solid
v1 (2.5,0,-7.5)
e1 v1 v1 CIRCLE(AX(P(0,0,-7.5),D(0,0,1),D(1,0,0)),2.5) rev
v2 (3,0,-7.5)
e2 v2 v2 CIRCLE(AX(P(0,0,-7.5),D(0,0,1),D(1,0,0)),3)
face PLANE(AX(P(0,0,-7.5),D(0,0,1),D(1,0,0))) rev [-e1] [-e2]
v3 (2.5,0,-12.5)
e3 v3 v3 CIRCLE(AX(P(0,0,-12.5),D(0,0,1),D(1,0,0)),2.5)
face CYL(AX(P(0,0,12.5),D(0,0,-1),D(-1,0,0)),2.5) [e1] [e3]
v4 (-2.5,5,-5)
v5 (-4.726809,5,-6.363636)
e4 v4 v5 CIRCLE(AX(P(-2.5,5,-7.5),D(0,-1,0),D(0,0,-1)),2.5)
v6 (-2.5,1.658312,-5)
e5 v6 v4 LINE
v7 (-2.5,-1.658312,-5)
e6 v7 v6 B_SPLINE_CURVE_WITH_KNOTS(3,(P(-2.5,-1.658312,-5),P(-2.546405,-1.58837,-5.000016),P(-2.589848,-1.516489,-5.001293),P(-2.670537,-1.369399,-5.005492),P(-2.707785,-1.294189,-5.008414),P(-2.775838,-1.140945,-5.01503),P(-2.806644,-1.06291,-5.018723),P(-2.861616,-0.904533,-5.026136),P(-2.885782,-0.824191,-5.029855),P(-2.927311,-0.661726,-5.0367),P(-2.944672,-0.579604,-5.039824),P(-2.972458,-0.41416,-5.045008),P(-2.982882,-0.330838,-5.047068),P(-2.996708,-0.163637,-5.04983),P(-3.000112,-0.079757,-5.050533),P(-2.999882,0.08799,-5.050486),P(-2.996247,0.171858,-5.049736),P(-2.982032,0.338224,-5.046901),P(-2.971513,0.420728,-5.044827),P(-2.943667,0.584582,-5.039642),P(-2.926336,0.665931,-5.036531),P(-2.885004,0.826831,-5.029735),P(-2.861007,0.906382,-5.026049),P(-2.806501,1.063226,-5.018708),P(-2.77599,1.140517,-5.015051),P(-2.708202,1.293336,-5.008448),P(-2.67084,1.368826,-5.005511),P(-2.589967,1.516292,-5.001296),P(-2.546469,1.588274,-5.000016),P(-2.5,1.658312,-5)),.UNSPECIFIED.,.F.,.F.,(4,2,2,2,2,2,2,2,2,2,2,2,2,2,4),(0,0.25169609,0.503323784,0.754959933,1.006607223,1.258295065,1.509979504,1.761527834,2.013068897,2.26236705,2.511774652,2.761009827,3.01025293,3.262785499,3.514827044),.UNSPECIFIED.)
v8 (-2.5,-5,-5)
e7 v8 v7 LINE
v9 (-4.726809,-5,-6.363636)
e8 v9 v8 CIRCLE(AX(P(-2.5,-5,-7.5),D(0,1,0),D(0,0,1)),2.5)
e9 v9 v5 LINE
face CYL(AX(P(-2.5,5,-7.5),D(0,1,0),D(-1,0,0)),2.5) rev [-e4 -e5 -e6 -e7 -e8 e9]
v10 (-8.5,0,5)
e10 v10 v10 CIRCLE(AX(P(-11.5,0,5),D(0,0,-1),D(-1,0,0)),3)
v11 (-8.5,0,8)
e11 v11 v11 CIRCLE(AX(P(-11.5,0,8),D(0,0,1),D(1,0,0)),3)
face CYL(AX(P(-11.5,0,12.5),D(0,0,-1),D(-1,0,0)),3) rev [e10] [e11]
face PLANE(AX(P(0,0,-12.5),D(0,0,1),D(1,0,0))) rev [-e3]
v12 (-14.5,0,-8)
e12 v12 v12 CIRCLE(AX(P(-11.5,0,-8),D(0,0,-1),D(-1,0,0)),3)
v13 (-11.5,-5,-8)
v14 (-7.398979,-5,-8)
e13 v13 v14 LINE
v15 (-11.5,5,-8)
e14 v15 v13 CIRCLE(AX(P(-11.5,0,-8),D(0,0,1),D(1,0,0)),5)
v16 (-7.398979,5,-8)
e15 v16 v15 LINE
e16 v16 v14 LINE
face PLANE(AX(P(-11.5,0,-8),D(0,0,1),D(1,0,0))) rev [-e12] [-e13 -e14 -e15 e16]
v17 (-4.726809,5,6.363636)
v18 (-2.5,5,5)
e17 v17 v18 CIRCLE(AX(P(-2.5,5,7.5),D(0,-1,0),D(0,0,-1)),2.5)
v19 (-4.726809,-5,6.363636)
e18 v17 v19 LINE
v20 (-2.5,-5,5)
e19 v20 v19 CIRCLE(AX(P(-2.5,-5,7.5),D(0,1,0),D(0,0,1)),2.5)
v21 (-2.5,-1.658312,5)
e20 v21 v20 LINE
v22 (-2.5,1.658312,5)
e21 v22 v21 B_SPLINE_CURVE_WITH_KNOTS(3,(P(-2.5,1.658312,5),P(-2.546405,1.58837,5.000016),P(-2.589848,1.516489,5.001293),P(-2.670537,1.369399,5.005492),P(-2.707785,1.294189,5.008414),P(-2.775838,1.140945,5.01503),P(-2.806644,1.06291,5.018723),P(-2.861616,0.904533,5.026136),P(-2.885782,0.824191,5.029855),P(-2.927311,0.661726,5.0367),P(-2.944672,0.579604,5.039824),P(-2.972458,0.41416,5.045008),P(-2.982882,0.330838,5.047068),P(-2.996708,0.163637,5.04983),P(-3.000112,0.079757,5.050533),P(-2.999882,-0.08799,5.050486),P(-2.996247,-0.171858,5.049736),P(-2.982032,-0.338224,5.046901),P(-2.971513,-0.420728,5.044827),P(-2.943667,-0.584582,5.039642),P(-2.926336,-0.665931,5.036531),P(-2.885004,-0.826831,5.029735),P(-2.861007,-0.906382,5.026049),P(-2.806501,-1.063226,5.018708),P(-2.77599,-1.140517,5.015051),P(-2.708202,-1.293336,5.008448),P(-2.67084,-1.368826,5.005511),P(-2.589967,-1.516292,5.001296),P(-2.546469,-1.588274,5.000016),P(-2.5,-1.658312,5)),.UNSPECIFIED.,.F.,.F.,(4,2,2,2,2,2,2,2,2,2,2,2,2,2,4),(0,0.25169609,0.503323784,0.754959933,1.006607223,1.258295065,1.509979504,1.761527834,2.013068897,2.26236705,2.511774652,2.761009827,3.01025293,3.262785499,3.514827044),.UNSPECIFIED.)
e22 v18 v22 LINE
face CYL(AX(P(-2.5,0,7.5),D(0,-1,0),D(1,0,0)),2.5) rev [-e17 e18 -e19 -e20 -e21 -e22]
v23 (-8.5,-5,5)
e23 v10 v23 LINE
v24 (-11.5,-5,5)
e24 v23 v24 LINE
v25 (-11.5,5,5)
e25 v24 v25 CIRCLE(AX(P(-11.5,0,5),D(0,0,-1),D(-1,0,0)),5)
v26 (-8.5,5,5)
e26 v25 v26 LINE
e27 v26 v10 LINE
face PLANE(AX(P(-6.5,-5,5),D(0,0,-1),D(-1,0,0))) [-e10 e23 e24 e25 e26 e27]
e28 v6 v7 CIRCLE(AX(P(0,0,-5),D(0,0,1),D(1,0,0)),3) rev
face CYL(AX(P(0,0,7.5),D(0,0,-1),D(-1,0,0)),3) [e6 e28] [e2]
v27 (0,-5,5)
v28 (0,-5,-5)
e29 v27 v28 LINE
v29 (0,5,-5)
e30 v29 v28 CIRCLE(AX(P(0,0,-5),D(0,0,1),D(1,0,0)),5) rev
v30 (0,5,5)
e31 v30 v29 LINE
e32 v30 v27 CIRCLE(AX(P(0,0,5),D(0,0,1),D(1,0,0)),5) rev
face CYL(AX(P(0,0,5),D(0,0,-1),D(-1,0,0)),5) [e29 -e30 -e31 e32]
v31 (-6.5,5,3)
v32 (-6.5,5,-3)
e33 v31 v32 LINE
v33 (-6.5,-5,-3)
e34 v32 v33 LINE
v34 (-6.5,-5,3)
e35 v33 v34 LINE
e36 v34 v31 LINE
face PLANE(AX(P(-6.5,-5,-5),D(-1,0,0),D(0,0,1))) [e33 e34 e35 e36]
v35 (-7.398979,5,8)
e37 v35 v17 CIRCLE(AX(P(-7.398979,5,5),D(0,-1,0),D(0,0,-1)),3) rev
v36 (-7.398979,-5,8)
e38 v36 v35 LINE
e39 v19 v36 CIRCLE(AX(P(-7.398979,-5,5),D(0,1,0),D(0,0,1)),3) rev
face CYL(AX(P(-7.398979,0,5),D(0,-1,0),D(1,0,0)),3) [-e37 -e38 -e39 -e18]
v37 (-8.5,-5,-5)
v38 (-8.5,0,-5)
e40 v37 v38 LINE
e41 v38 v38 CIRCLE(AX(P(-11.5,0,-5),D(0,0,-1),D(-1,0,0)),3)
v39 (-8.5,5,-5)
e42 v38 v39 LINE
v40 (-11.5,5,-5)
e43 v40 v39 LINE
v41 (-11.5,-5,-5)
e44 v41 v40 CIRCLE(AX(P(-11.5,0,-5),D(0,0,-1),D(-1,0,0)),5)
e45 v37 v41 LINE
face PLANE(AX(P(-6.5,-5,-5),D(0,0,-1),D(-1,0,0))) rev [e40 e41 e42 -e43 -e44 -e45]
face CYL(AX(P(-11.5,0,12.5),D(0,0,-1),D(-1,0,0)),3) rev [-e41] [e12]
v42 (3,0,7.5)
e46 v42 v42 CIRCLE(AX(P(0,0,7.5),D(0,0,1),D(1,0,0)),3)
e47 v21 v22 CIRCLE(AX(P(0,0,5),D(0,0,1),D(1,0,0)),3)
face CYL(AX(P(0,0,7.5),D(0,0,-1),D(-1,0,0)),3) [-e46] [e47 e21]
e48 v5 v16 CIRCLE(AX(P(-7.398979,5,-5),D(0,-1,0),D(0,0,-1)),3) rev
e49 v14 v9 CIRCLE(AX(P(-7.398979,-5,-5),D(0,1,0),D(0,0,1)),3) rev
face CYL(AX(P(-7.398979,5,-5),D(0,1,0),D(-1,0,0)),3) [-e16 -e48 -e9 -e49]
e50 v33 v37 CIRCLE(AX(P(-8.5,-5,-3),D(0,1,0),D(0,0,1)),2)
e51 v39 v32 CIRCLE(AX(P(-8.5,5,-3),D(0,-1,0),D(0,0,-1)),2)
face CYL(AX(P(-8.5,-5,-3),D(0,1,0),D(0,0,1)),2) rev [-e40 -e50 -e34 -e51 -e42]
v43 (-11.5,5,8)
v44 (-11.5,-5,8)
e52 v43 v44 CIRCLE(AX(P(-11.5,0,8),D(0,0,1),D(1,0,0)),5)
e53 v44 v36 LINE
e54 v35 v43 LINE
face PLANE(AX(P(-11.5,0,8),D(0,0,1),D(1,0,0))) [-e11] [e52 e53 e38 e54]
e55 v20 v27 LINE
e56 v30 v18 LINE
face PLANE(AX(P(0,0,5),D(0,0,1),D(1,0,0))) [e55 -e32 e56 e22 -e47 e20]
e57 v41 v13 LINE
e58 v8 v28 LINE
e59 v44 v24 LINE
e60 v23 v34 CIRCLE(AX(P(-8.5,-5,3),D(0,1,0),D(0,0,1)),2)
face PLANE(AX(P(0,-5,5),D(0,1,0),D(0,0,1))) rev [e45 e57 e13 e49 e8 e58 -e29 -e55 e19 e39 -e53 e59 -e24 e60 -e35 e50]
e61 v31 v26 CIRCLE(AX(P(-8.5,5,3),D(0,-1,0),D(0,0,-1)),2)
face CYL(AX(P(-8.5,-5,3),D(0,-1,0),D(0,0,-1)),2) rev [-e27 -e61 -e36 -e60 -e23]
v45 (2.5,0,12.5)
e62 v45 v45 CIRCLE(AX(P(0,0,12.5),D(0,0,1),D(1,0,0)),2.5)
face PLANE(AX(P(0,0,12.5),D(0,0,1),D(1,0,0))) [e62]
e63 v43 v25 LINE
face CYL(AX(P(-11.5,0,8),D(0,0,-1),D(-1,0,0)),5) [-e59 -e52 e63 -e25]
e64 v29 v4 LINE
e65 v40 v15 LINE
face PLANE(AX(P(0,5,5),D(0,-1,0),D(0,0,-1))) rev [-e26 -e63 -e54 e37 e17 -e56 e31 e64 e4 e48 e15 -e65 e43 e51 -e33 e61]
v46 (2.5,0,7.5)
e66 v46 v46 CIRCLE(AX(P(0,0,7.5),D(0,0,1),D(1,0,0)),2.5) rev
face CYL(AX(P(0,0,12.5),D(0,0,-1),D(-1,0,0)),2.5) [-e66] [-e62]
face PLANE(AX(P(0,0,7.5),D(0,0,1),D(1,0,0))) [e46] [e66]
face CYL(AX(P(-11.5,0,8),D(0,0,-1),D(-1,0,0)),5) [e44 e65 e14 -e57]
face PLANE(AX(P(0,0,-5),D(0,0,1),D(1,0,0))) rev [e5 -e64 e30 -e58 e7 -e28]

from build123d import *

# Parameters (mm, degrees)
SKETCH1_R               = 3
BOSS_EXTRUDE1_DEPTH     = 5
SKETCH1_3_R             = 3
BOSS_EXTRUDE2_DEPTH     = 7.5
SKETCH1_4_R             = 2.5
BOSS_EXTRUDE3_DEPTH     = 12.5
BOSS_EXTRUDE4_DEPTH     = 8
CUT_EXTRUDE1_DEPTH      = 23.989127865
CUT_EXTRUDE1_DEPTH_BACK = 23.989127865
SKETCH6_W               = 10
SKETCH6_H               = 10
SKETCH7_R               = 3
CUT_EXTRUDE2_DEPTH      = 27.786190472
FILLET4_R               = 2.5
FILLET5_R               = 3
FILLET6_R               = 2


# Some blends are built 0.0001 mm under size
with BuildPart() as part:
    # Sketch1 → Boss-Extrude1 (new, symmetric)
    with BuildSketch(Plane.XY):
        with BuildLine():
            ThreePointArc((0, 5), (5, 0), (0, -5))
            Line((0, -5), (-5, -5))
            Line((-5, -5), (-5, 5))
            Line((-5, 5), (0, 5))
        make_face()
        Circle(SKETCH1_R, mode=Mode.SUBTRACT)
    extrude(amount=BOSS_EXTRUDE1_DEPTH, both=True)

    # Sketch1<3> → Boss-Extrude2 (add, symmetric)
    with BuildSketch(Plane.XY):
        Circle(SKETCH1_3_R)
    extrude(amount=BOSS_EXTRUDE2_DEPTH, both=True)

    # Sketch1<4> → Boss-Extrude3 (add, symmetric)
    with BuildSketch(Plane.XY):
        Circle(SKETCH1_4_R)
    extrude(amount=BOSS_EXTRUDE3_DEPTH, both=True)

    # Sketch5 → Boss-Extrude4 (add, symmetric)
    with BuildSketch(Plane.XY):
        with BuildLine():
            Line((-5, 5), (-5, -5))
            Line((-5, -5), (-11.5, -5))
            ThreePointArc((-11.5, -5), (-16.5, 0), (-11.5, 5))
            Line((-11.5, 5), (-5, 5))
        make_face()
    extrude(amount=BOSS_EXTRUDE4_DEPTH, both=True)

    # Sketch6 → Cut-Extrude1 (cut, two sides: drawn at the far end of the back side and taken through both)
    with BuildSketch(Plane(origin=(0, 5, 0), x_dir=(1, 0, 0), z_dir=(0, 1, 0)).offset(-CUT_EXTRUDE1_DEPTH_BACK)):
        with Locations((-11.5, 0)):
            Rectangle(SKETCH6_W, SKETCH6_H)
    extrude(amount=CUT_EXTRUDE1_DEPTH + CUT_EXTRUDE1_DEPTH_BACK, mode=Mode.SUBTRACT)

    # Sketch7 → Cut-Extrude2 (cut, through all)
    with BuildSketch(Plane(origin=(0, 0, -8), x_dir=(-1, 0, 0), z_dir=(0, 0, -1))):
        with Locations((11.5, 0)):
            Circle(SKETCH7_R)
    extrude(amount=-CUT_EXTRUDE2_DEPTH, mode=Mode.SUBTRACT)

    # Fillet4
    # the kernel refuses this fillet: 2.5 mm, written as the material it adds along each edge
    with BuildSketch(Plane(origin=(-5, -5, 5), x_dir=(0, 0, 1), z_dir=(0, 1, 0)), Plane(origin=(-5, -5, -5), x_dir=(1, 0, 0), z_dir=(0, 1, 0))) as fillet4_piece_1:
        with BuildLine():
            CenterArc((FILLET4_R, FILLET4_R), FILLET4_R, 180, 90)
            Line((0, FILLET4_R), (0, 0))
            Line((0, 0), (FILLET4_R, 0))
        make_face()
    extrude(amount=10)

    # Fillet5
    fillet5_edges = [part.edges().sort_by_distance(p)[0] for p in [
        (-5, 0, -8),
        (-5, 0, 8),
    ]]
    fillet(fillet5_edges, radius=FILLET5_R)

    # Fillet6
    fillet6_edges = [part.edges().sort_by_distance(p)[0] for p in [
        (-6.5, 0, -5),
        (-6.5, 0, 5),
    ]]
    fillet(fillet6_edges, radius=FILLET6_R - 0.0001)  # a hair under: the kernel refuses the full size


solid = part.part
